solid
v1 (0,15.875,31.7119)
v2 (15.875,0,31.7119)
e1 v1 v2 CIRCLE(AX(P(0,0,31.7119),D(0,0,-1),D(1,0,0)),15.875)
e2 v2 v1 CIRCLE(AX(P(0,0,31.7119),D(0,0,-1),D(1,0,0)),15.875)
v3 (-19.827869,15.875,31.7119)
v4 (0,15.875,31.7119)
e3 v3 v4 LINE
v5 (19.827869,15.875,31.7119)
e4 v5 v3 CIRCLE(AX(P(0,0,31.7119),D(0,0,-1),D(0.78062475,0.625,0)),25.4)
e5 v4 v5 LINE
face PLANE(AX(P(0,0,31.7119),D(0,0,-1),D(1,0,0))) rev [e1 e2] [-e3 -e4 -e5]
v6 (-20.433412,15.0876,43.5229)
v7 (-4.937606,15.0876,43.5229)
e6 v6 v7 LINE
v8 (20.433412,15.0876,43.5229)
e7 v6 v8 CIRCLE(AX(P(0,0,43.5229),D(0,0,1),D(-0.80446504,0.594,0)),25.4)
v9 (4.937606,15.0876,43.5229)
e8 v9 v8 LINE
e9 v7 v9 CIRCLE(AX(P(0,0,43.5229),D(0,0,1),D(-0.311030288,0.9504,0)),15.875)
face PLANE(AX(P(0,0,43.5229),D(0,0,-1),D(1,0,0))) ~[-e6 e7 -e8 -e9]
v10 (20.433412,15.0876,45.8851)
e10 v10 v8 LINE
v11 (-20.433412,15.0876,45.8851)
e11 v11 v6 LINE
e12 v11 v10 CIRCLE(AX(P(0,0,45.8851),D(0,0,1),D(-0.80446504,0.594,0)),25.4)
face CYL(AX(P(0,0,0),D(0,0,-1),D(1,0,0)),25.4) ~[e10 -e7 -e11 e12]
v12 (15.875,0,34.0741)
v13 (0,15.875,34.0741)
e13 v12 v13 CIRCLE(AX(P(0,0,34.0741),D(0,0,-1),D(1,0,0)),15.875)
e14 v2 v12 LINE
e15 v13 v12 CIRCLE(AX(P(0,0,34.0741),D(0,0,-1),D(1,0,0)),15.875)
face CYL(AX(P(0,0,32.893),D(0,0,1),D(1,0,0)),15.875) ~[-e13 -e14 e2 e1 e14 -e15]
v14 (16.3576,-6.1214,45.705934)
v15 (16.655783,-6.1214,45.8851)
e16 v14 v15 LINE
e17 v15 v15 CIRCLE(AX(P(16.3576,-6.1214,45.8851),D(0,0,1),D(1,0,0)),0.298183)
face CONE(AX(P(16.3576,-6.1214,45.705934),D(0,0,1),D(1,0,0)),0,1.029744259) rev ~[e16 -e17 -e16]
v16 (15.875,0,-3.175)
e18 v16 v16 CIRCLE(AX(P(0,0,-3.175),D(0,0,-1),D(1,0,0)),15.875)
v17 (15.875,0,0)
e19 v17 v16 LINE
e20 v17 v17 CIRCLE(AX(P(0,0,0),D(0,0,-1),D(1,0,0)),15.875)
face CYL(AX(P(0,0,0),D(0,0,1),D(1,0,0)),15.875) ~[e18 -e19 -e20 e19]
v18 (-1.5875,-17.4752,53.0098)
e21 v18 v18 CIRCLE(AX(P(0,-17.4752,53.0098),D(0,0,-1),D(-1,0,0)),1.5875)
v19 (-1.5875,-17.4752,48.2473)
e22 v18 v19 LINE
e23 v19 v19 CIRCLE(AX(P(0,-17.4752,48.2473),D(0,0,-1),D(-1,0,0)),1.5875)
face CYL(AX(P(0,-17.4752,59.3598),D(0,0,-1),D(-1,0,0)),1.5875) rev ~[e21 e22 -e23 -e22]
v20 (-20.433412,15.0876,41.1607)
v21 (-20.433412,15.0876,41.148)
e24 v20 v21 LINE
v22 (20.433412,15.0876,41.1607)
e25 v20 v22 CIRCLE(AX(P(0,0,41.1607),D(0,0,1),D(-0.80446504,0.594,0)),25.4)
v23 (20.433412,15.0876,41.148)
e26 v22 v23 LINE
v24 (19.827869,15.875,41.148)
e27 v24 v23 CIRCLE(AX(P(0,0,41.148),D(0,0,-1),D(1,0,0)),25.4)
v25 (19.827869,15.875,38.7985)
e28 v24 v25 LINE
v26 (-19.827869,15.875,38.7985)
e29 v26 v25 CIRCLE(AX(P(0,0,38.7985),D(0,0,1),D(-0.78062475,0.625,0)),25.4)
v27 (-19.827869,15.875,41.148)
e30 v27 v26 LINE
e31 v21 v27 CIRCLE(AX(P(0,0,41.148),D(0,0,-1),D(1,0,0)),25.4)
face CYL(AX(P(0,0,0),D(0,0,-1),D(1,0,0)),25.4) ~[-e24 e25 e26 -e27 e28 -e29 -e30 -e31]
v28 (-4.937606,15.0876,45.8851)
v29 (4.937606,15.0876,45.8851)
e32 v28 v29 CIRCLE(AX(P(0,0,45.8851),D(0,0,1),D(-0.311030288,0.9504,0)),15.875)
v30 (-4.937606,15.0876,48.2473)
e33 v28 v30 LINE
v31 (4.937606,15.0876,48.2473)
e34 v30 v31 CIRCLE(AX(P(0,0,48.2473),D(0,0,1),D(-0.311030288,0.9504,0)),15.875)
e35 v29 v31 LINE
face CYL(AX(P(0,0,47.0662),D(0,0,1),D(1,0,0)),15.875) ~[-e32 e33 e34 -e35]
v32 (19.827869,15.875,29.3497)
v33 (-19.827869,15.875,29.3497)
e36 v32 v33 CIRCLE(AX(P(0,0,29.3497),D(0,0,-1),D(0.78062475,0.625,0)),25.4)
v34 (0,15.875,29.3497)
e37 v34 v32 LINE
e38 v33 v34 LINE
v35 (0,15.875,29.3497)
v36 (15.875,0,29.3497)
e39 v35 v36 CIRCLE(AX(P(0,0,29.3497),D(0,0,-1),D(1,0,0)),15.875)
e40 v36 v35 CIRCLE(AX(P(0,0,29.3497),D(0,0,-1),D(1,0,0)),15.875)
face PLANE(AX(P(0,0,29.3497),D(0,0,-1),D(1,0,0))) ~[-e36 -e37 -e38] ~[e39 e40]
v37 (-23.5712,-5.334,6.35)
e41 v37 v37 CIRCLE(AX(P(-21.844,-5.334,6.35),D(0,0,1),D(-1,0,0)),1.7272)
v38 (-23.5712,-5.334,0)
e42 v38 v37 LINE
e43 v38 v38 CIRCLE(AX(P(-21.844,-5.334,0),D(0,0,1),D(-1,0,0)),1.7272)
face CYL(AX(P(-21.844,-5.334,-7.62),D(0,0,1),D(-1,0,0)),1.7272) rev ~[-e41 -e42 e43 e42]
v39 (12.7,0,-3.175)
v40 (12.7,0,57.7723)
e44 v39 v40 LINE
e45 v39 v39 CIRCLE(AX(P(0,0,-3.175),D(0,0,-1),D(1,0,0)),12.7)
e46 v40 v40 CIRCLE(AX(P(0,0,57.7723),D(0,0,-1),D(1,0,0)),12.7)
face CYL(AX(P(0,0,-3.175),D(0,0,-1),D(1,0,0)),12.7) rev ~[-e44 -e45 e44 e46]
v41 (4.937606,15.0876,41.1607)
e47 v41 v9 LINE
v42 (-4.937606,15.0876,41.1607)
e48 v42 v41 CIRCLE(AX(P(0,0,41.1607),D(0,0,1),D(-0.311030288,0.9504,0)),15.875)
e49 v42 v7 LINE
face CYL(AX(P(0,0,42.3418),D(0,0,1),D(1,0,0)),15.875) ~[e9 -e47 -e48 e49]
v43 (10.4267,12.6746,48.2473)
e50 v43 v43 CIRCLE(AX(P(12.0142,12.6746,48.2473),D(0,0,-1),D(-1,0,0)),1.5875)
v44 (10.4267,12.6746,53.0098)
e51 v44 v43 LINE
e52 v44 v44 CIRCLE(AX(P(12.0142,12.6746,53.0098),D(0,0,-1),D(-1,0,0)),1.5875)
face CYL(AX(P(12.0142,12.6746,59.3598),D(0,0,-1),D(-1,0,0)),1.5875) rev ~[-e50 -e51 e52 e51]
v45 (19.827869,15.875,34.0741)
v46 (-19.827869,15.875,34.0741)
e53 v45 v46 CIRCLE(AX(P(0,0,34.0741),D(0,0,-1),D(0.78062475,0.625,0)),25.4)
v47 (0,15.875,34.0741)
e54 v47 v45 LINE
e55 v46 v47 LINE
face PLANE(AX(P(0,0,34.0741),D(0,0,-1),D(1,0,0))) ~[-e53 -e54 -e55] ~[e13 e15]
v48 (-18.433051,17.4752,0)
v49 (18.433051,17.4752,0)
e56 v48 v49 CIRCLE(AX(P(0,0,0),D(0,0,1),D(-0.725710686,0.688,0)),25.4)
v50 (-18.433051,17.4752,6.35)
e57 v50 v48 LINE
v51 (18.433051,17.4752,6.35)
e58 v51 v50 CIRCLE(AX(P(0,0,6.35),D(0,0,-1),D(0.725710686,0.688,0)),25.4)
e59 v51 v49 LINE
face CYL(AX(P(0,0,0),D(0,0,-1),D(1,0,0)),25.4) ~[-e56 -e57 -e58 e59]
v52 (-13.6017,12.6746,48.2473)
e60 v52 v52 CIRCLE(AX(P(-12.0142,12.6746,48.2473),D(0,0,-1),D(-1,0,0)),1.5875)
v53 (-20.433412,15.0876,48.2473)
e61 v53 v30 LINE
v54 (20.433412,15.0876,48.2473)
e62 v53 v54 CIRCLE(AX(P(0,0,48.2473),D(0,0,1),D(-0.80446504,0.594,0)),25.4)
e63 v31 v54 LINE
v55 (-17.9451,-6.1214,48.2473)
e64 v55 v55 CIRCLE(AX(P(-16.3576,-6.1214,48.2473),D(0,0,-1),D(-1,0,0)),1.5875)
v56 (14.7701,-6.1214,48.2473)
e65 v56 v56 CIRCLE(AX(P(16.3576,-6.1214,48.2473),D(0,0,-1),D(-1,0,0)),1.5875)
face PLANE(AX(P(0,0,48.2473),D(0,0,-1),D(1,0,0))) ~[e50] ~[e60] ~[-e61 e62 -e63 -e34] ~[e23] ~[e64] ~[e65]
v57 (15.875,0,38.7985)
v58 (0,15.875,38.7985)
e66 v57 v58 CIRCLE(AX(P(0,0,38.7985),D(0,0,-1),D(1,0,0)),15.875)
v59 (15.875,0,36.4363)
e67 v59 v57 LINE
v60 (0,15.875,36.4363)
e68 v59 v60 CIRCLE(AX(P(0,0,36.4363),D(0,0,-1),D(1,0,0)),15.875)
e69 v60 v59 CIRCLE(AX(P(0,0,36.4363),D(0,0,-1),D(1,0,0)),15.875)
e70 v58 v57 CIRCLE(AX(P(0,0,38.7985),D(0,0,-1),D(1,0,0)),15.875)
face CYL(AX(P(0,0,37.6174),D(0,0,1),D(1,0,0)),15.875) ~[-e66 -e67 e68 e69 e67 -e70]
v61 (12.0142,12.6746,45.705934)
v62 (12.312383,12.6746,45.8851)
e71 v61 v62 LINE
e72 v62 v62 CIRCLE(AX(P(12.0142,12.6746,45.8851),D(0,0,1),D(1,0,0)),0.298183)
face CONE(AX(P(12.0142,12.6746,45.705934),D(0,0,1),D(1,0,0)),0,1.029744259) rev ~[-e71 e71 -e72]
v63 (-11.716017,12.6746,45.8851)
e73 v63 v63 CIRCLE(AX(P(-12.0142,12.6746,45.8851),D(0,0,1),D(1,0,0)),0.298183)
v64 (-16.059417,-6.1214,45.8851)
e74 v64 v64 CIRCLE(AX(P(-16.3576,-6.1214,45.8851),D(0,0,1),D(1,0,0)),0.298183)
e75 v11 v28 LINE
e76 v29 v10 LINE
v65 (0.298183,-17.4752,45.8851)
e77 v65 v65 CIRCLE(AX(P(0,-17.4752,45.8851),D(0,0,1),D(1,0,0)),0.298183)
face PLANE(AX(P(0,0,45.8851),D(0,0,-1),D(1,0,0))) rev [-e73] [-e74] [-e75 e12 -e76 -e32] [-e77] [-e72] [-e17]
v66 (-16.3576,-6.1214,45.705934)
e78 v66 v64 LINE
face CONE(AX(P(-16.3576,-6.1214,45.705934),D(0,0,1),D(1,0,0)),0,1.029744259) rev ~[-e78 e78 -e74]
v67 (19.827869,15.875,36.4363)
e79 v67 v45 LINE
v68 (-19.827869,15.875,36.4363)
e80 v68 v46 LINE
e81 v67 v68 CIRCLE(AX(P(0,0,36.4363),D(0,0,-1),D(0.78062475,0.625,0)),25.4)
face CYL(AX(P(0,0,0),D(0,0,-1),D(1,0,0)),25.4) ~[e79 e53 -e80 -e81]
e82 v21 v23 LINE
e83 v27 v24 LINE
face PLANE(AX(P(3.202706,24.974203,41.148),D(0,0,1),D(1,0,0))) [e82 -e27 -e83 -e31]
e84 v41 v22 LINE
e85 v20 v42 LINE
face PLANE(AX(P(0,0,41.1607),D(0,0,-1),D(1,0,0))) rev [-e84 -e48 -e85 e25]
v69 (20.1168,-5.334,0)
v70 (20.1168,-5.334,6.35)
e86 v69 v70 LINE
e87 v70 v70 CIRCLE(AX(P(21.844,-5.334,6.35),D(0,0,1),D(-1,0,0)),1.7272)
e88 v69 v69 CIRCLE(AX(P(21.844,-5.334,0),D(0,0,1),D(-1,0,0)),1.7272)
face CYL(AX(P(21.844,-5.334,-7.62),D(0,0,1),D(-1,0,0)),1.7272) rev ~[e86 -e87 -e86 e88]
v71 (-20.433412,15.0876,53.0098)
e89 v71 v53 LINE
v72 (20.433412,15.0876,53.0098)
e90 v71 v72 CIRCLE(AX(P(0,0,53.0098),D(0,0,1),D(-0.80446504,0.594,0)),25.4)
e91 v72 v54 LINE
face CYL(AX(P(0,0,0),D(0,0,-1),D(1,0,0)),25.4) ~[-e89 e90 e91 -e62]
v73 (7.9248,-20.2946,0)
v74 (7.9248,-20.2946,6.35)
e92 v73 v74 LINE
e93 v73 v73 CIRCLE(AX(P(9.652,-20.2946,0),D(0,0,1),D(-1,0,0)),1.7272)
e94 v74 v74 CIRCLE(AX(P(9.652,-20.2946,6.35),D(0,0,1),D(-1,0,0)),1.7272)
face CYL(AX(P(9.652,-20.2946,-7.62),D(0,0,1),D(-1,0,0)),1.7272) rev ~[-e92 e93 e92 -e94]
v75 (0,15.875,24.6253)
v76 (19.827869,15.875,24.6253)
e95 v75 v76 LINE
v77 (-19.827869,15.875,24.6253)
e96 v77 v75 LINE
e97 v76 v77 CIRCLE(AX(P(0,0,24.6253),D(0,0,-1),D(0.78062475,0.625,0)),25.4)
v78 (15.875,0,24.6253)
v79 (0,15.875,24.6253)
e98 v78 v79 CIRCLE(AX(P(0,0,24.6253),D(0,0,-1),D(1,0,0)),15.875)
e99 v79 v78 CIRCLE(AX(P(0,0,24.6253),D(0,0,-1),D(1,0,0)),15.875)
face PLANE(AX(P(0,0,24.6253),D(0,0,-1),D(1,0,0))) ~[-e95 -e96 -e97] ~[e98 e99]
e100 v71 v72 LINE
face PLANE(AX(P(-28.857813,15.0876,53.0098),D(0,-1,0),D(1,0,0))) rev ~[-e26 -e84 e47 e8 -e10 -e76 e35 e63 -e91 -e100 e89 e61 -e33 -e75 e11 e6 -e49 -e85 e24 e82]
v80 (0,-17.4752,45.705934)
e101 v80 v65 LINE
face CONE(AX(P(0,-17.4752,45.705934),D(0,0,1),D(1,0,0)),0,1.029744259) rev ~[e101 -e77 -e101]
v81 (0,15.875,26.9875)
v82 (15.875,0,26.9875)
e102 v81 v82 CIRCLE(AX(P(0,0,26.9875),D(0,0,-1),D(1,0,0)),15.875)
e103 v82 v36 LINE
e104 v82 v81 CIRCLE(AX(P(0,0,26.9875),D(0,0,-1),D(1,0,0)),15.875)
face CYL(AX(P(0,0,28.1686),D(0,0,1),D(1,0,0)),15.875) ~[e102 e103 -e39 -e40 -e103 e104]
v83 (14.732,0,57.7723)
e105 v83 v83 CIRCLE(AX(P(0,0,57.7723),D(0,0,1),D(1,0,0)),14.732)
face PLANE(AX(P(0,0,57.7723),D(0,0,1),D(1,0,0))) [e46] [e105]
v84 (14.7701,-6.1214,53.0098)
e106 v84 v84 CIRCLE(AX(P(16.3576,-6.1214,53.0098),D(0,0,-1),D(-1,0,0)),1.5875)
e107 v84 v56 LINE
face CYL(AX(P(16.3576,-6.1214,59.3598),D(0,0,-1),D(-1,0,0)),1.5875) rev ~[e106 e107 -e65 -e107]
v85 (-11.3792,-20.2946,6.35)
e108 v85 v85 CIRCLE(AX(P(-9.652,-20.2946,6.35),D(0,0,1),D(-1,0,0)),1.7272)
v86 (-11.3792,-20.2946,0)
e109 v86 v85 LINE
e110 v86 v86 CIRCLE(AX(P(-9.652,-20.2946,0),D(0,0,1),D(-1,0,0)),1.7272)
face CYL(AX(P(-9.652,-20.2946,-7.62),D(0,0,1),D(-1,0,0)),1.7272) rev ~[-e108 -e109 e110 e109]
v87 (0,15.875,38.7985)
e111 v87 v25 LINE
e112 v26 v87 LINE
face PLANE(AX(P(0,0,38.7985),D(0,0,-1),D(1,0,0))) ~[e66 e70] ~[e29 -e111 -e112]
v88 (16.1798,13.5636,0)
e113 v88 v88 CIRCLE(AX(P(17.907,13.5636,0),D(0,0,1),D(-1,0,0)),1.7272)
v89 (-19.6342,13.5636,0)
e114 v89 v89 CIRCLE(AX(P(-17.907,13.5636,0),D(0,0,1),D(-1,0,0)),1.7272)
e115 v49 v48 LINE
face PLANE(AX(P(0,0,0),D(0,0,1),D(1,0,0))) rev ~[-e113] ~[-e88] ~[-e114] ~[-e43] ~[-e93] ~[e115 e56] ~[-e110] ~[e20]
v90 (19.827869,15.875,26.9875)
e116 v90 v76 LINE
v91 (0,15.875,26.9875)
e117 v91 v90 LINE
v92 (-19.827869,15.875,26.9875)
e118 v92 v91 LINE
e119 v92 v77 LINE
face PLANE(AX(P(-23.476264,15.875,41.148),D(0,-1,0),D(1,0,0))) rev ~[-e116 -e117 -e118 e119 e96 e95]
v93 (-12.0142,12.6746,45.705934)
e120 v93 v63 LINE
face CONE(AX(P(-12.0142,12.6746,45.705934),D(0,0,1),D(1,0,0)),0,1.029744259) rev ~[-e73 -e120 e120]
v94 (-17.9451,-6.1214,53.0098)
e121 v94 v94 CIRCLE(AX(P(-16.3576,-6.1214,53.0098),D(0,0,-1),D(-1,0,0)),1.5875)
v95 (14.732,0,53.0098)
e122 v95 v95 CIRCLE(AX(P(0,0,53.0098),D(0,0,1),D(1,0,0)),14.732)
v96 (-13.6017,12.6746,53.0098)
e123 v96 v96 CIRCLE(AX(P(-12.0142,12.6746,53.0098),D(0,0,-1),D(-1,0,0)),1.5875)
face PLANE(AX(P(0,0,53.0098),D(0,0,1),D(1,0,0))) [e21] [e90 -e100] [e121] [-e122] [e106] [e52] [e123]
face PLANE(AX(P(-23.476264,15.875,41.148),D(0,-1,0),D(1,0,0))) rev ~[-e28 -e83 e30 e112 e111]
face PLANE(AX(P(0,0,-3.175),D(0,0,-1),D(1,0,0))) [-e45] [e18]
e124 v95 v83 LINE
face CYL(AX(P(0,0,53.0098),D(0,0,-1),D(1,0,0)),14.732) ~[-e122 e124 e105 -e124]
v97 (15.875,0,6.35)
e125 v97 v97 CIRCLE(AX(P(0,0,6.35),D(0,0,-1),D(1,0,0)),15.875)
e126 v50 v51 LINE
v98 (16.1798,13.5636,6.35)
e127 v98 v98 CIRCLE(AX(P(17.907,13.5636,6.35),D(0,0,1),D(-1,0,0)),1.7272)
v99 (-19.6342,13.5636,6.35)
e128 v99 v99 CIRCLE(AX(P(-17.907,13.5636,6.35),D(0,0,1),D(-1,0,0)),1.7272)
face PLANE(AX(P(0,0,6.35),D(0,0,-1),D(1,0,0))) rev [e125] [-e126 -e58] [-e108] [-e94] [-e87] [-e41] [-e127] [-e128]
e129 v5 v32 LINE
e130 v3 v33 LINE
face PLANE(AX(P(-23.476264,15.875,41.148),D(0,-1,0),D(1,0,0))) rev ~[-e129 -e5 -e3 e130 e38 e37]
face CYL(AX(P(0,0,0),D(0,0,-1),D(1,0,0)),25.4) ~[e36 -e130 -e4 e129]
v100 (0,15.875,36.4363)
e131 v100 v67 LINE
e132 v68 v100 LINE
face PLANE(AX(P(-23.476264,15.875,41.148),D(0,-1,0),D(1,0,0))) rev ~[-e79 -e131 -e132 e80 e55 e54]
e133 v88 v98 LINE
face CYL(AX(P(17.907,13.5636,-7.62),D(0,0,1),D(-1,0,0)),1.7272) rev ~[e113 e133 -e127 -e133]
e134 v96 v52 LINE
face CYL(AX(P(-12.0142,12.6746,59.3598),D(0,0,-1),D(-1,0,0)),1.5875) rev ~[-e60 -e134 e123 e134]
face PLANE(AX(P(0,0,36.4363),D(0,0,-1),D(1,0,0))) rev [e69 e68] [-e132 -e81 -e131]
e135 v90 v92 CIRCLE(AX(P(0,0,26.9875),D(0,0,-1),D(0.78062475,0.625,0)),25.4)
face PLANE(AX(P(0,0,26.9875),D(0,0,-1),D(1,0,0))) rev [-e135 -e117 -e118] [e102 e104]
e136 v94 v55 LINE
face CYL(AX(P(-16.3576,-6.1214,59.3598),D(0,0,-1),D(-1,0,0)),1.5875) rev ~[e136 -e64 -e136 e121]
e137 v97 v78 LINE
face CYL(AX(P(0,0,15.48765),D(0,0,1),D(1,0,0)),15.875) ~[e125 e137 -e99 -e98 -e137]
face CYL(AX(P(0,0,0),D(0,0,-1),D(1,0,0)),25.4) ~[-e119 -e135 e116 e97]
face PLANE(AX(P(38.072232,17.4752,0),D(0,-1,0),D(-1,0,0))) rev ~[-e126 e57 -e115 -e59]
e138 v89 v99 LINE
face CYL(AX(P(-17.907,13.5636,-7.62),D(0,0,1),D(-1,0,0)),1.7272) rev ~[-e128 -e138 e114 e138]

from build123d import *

# Parameters (mm, degrees)
F0_R      = 25.4
F1_DEPTH  = 53.0098
F2_R      = 14.732
F3_DEPTH  = 4.7625
F4_R      = 15.875
F5_DEPTH  = 3.175
F7_R      = 12.7
F8_DEPTH  = 60.9483
F9_W      = 12.1422023922
F9_H      = 2.3622
F11_W     = 13.3322854936
F11_H     = 18.2753
F14_DEPTH = 11.8618
F16_DEPTH = 16.637
F18_DEPTH = 6.477
F20_D     = 3.4544
F20_DEPTH = 7.62
F20_TIP   = 1.0378064612
F22_D     = 3.175
F22_DEPTH = 6.35
F22_TIP   = 0.9538662327


# Not quite as in the source:
# - a feature names something its author has since deleted; it is built from what else it names


with BuildPart() as f1:
    # F0 (on Top) → F1 (new body)
    with BuildSketch(Plane.XY):
        Circle(F0_R)
    extrude(amount=F1_DEPTH)

    # F2 (on face) → F3 (join)
    with BuildSketch(Plane.XY.offset(53.0098)):
        Circle(F2_R)
    extrude(amount=F3_DEPTH)

    # F4 (on face) → F5 (join)
    with BuildSketch(Plane(origin=(0, 0, 0), x_dir=(1, 0, 0), z_dir=(0, 0, -1))):
        Circle(F4_R)
    extrude(amount=F5_DEPTH)

    # F7 (on face) → F8 (cut, through all)
    with BuildSketch(Plane(origin=(0, 0, -3.175), x_dir=(1, 0, 0), z_dir=(0, 0, -1))):
        Circle(F7_R)
    extrude(amount=-F8_DEPTH, mode=Mode.SUBTRACT)

    # F9 (on Front) → F10 (revolve, cut)
    with BuildSketch(Plane.XZ):
        with Locations((21.9461011961, 47.0662)):
            Rectangle(F9_W, F9_H)
        with Locations((21.9461011961, 42.3418)):
            Rectangle(F9_W, F9_H)
        with Locations((21.9461011961, 37.6174)):
            Rectangle(F9_W, F9_H)
        with Locations((21.9461011961, 32.893)):
            Rectangle(F9_W, F9_H)
        with Locations((21.9461011961, 28.1686)):
            Rectangle(F9_W, F9_H)
    revolve(axis=Axis((0, 0, 0), (0, 0, -1)), mode=Mode.SUBTRACT)

    # F11 (on Front) → F12 (revolve, cut)
    with BuildSketch(Plane.XZ):
        with Locations((22.5411427468, 15.48765)):
            Rectangle(F11_W, F11_H)
    revolve(axis=Axis((0, 0, 0), (0, 0, -1)), mode=Mode.SUBTRACT)

    # F13 (on face) → F14 (cut)
    with BuildSketch(Plane.XY.offset(53.0098)):
        with BuildLine():
            Line((-28.8578128478, 32.0924090841), (-28.8578128478, 15.0876))
            Line((-28.8578128478, 15.0876), (-20.4334120068, 15.0876))
            ThreePointArc((-20.4334120068, 15.0876), (0, 25.4), (20.4334120068, 15.0876))
            Line((20.4334120068, 15.0876), (35.4937171599, 15.0876))
            Line((35.4937171599, 15.0876), (35.4937171599, 32.0924090841))
            Line((35.4937171599, 32.0924090841), (-28.8578128478, 32.0924090841))
        make_face()
        with BuildLine():
            ThreePointArc((20.4334120068, 15.0876), (0, 25.4), (-20.4334120068, 15.0876))
            Line((-20.4334120068, 15.0876), (20.4334120068, 15.0876))
        make_face()
    extrude(amount=-F14_DEPTH, mode=Mode.SUBTRACT)

    # F15 (on face) → F16 (cut)
    with BuildSketch(Plane.XY.offset(41.148)):
        with BuildLine():
            Line((22.7077871409, 25.7988459408), (-23.4762642381, 25.7988459408))
            Line((-23.4762642381, 25.7988459408), (-23.4762642381, 15.875))
            Line((-23.4762642381, 15.875), (-19.8278686449, 15.875))
            ThreePointArc((-19.8278686449, 15.875), (0, 25.4), (19.8278686449, 15.875))
            Line((19.8278686449, 15.875), (22.7077871409, 15.875))
            Line((22.7077871409, 15.875), (22.7077871409, 25.7988459408))
        make_face()
        with BuildLine():
            ThreePointArc((19.8278686449, 15.875), (0, 25.4), (-19.8278686449, 15.875))
            Line((-19.8278686449, 15.875), (19.8278686449, 15.875))
        make_face()
    extrude(amount=-F16_DEPTH, mode=Mode.SUBTRACT)

    # F17 (on face) → F18 (cut)
    with BuildSketch(Plane(origin=(0, 0, 0), x_dir=(1, 0, 0), z_dir=(0, 0, -1))):
        with BuildLine():
            Line((-18.4330514283, -17.4752), (-34.0658536954, -17.4752))
            Line((-34.0658536954, -17.4752), (-34.0658536954, -39.2576220664))
            Line((-34.0658536954, -39.2576220664), (38.0722320481, -39.2576220664))
            Line((38.0722320481, -39.2576220664), (38.0722320481, -17.4752))
            Line((38.0722320481, -17.4752), (18.4330514283, -17.4752))
            ThreePointArc((18.4330514283, -17.4752), (0, -25.4), (-18.4330514283, -17.4752))
        make_face()
        with BuildLine():
            Line((18.4330514283, -17.4752), (-18.4330514283, -17.4752))
            ThreePointArc((-18.4330514283, -17.4752), (0, -25.4), (18.4330514283, -17.4752))
        make_face()
    extrude(amount=-F18_DEPTH, mode=Mode.SUBTRACT)

    # F20
    with Locations(Plane(origin=(0, 0, 0), x_dir=(1, 0, 0), z_dir=(0, 0, -1))):
        with Locations((-17.907, -13.5636), (-21.844, 5.334), (-9.652, 20.2946), (9.652, 20.2946), (21.844, 5.334), (17.907, -13.5636)):
            Hole(F20_D / 2, depth=F20_DEPTH)
            with Locations((0, 0, -(F20_DEPTH + F20_TIP / 2))):  # 118° drill point
                Cone(0, F20_D / 2, F20_TIP, mode=Mode.SUBTRACT)

    # F22
    with Locations(Plane.XY.offset(53.0098)):
        with Locations((-12.0142, 12.6746), (12.0142, 12.6746), (16.3576, -6.1214), (-16.3576, -6.1214), (0, -17.4752)):
            Hole(F22_D / 2, depth=F22_DEPTH)
            with Locations((0, 0, -(F22_DEPTH + F22_TIP / 2))):  # 118° drill point
                Cone(0, F22_D / 2, F22_TIP, mode=Mode.SUBTRACT)


solid = f1.part
